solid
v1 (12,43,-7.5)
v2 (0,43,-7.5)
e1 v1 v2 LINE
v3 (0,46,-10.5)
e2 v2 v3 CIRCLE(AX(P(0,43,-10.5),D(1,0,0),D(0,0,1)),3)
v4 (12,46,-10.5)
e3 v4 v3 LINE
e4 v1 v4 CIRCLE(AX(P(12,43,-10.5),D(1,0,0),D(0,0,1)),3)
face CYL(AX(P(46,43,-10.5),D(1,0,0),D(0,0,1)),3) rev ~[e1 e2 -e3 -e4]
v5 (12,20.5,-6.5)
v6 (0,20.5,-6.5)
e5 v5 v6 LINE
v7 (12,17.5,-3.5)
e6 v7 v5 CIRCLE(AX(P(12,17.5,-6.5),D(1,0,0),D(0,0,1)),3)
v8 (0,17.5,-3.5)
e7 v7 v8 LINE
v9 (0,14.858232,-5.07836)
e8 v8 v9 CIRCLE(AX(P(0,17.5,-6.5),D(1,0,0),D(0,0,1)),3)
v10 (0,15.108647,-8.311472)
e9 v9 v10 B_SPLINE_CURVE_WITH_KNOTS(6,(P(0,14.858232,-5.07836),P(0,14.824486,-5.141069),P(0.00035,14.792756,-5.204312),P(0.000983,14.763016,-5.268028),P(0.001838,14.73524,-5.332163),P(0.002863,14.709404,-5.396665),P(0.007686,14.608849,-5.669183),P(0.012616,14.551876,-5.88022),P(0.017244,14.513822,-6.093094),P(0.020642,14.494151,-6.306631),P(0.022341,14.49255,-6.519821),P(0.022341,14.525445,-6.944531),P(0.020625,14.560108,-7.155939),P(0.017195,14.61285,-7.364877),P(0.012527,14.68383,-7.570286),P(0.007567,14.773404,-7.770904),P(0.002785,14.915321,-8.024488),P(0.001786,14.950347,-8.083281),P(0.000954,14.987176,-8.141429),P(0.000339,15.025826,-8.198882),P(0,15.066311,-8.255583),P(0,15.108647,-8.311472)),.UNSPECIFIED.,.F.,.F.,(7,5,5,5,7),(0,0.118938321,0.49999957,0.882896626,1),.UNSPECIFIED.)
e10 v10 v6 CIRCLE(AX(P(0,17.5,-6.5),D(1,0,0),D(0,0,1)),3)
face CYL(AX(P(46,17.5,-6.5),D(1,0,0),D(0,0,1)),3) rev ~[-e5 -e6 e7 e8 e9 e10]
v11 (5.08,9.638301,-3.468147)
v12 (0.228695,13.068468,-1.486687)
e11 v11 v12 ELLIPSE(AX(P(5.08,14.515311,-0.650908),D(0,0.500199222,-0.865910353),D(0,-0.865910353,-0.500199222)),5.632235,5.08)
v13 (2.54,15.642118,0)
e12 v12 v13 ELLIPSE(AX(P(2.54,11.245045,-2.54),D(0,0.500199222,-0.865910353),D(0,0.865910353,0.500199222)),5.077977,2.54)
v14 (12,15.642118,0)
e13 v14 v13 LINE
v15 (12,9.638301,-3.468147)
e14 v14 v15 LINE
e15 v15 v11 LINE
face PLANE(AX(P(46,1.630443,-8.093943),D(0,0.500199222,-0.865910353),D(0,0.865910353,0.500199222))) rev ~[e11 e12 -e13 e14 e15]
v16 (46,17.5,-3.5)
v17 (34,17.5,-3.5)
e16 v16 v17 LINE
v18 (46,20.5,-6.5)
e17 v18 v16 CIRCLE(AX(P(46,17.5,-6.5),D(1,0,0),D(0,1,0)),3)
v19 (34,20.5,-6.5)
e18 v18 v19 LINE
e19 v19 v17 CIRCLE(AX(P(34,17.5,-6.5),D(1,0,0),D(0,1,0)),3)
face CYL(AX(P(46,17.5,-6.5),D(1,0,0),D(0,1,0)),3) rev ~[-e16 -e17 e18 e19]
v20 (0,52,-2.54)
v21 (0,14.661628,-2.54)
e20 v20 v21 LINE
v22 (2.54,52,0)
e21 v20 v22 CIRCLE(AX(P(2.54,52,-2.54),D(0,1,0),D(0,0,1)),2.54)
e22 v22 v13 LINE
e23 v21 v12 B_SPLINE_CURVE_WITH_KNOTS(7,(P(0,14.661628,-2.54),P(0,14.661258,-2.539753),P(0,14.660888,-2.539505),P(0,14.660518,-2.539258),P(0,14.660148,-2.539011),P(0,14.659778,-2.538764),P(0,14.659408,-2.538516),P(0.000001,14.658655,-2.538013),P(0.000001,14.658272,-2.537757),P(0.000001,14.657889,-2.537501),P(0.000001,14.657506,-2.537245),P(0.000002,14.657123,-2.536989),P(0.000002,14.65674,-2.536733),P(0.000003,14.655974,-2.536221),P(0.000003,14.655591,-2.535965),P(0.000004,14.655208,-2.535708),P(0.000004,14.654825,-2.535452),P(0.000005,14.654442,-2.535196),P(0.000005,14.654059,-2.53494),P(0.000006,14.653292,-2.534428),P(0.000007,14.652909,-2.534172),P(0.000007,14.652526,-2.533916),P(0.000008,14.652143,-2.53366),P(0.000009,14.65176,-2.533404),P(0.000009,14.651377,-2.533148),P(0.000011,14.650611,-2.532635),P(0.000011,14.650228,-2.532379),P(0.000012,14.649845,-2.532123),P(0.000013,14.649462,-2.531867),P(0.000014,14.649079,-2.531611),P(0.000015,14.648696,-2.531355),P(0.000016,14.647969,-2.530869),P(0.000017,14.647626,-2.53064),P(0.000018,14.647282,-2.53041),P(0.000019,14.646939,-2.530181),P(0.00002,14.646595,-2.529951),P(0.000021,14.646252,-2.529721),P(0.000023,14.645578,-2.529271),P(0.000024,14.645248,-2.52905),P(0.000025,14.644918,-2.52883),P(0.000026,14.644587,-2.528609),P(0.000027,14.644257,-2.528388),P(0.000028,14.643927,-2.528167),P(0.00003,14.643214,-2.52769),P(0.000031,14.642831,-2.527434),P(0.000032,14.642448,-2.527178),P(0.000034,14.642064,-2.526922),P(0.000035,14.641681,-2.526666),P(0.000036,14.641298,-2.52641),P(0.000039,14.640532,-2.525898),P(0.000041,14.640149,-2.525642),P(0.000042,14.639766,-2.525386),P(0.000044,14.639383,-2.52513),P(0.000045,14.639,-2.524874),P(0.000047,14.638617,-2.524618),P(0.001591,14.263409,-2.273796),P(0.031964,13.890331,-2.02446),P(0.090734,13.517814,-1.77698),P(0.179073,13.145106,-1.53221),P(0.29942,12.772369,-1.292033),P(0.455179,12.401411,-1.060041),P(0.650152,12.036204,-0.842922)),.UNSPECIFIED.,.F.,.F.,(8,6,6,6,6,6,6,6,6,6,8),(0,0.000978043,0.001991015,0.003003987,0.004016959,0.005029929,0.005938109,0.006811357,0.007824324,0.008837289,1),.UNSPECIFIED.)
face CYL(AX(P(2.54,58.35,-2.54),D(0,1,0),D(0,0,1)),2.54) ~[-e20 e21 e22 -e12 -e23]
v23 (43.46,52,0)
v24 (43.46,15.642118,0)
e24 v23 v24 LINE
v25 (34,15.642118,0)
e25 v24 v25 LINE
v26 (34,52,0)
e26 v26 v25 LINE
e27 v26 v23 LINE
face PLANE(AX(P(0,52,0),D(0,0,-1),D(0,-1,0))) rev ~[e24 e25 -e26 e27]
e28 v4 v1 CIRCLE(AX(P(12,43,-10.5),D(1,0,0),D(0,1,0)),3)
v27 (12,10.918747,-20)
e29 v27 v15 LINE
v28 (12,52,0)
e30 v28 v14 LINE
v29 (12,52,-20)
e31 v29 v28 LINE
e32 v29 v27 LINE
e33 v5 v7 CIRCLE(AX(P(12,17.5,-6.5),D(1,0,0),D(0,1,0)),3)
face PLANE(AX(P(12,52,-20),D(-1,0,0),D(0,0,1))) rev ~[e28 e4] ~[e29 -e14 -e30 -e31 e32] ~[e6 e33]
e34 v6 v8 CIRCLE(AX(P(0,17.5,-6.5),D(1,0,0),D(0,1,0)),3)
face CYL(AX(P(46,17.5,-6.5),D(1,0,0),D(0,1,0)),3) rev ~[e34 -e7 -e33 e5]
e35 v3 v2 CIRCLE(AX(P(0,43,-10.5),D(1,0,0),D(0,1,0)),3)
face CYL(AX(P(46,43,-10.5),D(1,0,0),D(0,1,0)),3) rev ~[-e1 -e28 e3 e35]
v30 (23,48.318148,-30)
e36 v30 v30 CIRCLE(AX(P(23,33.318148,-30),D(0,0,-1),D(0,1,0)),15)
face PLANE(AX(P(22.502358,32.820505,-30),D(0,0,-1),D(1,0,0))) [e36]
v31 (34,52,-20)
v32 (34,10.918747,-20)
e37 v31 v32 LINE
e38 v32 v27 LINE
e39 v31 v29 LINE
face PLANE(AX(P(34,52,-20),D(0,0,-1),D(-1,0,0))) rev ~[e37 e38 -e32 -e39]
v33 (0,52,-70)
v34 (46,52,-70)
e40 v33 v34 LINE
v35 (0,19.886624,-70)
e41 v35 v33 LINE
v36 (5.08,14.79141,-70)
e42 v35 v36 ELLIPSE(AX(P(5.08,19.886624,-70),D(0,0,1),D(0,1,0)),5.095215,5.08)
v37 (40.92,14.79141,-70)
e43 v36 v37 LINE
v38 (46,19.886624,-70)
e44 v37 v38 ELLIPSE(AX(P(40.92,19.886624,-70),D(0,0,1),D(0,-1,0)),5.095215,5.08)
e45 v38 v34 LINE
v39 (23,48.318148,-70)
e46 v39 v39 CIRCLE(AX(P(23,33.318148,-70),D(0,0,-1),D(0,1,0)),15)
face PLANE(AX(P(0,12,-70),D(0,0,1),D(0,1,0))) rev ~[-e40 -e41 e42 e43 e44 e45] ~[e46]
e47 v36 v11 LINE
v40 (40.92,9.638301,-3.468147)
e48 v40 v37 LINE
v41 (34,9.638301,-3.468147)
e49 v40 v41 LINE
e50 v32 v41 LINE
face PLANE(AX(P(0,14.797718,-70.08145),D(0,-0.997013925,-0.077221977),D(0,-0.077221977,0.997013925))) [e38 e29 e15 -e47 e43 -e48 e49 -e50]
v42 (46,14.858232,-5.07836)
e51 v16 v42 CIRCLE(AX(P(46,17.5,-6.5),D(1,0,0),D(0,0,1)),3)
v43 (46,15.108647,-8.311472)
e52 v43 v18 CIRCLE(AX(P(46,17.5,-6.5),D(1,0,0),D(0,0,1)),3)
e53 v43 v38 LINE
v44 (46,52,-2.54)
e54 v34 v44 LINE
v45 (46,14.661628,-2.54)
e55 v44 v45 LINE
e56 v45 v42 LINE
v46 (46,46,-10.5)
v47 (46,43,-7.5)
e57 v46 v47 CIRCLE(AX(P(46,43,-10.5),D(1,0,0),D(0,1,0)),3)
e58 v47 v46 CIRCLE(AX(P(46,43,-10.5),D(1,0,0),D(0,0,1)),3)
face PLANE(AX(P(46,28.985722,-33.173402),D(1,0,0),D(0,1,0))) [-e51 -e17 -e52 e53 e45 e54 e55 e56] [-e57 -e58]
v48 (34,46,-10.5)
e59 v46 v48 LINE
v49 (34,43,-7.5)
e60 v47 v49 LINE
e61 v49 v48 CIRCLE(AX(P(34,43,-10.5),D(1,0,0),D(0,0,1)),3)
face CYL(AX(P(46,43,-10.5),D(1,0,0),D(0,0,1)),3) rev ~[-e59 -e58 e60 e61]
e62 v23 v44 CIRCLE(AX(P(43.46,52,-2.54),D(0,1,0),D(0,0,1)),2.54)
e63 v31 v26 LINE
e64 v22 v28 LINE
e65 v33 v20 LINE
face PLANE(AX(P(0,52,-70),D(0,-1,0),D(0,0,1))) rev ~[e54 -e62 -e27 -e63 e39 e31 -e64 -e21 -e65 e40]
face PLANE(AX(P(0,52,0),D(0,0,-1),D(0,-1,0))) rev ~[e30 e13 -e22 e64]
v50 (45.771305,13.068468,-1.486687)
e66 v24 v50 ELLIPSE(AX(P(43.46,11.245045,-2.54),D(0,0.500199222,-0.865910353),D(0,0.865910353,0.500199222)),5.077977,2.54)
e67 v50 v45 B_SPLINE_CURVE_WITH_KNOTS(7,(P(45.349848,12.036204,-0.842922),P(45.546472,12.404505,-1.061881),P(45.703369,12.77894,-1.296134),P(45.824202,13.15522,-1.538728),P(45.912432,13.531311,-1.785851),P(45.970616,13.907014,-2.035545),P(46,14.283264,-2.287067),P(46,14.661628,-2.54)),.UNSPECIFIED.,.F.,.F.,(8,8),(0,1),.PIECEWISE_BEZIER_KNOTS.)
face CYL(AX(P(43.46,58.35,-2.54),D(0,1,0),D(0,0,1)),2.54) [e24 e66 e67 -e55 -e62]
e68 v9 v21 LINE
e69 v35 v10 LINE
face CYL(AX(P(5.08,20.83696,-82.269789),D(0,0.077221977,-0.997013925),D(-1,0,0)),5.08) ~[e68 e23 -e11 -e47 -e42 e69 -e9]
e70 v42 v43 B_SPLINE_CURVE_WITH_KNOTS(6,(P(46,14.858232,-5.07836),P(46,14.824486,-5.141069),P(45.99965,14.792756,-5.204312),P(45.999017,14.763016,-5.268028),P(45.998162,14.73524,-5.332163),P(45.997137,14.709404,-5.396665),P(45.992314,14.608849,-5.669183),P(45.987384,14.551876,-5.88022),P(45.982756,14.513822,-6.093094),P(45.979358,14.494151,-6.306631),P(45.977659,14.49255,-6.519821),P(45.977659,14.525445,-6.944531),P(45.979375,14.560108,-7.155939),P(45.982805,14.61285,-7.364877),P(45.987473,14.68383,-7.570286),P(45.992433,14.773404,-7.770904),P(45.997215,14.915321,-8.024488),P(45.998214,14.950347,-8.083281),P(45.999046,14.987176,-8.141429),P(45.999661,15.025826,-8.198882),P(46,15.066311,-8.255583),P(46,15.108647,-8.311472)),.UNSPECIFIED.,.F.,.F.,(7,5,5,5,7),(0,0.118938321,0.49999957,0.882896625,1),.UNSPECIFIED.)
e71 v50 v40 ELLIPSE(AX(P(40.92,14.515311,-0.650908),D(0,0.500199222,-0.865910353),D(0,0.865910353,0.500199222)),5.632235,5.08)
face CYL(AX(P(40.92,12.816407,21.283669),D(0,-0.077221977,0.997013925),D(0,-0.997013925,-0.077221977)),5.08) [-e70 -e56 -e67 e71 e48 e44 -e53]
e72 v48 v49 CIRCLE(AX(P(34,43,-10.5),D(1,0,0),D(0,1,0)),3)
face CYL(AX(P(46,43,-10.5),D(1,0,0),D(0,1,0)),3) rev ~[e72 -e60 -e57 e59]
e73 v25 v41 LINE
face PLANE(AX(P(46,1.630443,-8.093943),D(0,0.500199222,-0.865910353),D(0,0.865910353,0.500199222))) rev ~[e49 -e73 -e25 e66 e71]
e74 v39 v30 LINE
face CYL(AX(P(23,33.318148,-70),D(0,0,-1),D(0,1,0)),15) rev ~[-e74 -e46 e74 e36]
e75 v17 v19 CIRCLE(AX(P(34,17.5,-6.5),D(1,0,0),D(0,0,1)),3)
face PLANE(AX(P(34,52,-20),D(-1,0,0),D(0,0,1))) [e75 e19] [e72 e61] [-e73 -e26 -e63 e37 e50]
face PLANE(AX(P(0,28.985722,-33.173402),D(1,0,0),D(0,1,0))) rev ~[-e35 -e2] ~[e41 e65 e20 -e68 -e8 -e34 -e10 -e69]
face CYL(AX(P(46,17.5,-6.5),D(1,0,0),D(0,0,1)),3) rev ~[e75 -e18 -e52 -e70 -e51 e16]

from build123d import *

# Parameters (mm, degrees)
F1_DEPTH     = 46
F3_DEPTH     = 40
F5_DEPTH     = 254
F6_W         = 22
F6_H         = 20
F7_DEPTH     = 1346.2
F8_DEPTH     = 65
F10_DEPTH    = 127
F12_DEPTH    = 254
F14_DEPTH    = 254
F15_T1_DEPTH = 103.8636030304
F15_T3_DEPTH = 103.8636030304
F17_T1_DEPTH = 49.0578822911


# Not quite as in the source:
# - a fillet or chamfer that OpenCascade refuses, or shapes differently, is made with other operations: its cross-section is extruded or revolved along the edge and cut away or added
# - a feature of the source that left no trace in its solid (it failed there, or was rolled back) is left out


with BuildPart() as f1:
    # F0 (on Right) → F1 (new body)
    with BuildSketch(Plane.YZ):
        Polygon((52, 0), (0, 0), (12, -60), (12, -70), (52, -70), align=None)
    extrude(amount=F1_DEPTH)

    # F2 (on face) → F3 (cut)
    with BuildSketch(Plane(origin=(0, 0, -70), x_dir=(1, 0, 0), z_dir=(0, 0, -1))):
        with BuildLine():
            Line((23, -33.3181476), (38, -33.3181476))
            ThreePointArc((38, -33.3181476), (12.3933982822, -22.7115458822), (23, -48.3181476))
            Line((23, -48.3181476), (23, -33.3181476))
        make_face()
        with BuildLine():
            ThreePointArc((23, -48.3181476), (33.6066017178, -43.9247493178), (38, -33.3181476))
            Line((38, -33.3181476), (23, -33.3181476))
            Line((23, -33.3181476), (23, -48.3181476))
        make_face()
    extrude(amount=-F3_DEPTH, mode=Mode.SUBTRACT)

    # F4 (on face) → F5 (cut)
    with BuildSketch(Plane.YZ.offset(46)):
        with BuildLine():
            Line((17.5, -6.5), (20.5, -6.5))
            ThreePointArc((20.5, -6.5), (19.6213203436, -4.3786796564), (17.5, -3.5))
            Line((17.5, -3.5), (17.5, -6.5))
        make_face()
        with BuildLine():
            ThreePointArc((17.5, -3.5), (15.3786796564, -8.6213203436), (20.5, -6.5))
            Line((20.5, -6.5), (17.5, -6.5))
            Line((17.5, -6.5), (17.5, -3.5))
        make_face()
    extrude(amount=-F5_DEPTH, mode=Mode.SUBTRACT)

    # F6 (on face) → F7 (cut)
    with BuildSketch(Plane(origin=(0, 52, 0), x_dir=(-1, 0, 0), z_dir=(0, 1, 0))):
        with Locations((-23, -10)):
            Rectangle(F6_W, F6_H)
    extrude(amount=-F7_DEPTH, mode=Mode.SUBTRACT)

    # F4 (on face) → F8 (cut)
    with BuildSketch(Plane.YZ.offset(46)):
        with BuildLine():
            ThreePointArc((43, -7.5), (40.8786796564, -12.6213203436), (46, -10.5))
            ThreePointArc((46, -10.5), (45.1213203436, -8.3786796564), (43, -7.5))
        make_face()
    extrude(amount=-F8_DEPTH, mode=Mode.SUBTRACT)

    # F9 (on face) → F10 (cut)
    with BuildSketch(Plane.YZ.offset(46)):
        Polygon((1.1435132474, -8.0939428881), (1.6304426827, -8.0939428881), (15.6421177089, 0), (0, 0), align=None)
    extrude(amount=-F10_DEPTH, mode=Mode.SUBTRACT)

    # F11 (on Right) → F12 (cut)
    with BuildSketch(Plane.YZ):
        Polygon((0, -70.3560113907), (14.7977182642, -70.0814500451), (9.3696815893, 0), (0, 0), align=None)
    extrude(amount=F12_DEPTH, mode=Mode.SUBTRACT)

    # F13 (on face) → F14 (cut)
    with BuildSketch(Plane.XY):
        with BuildLine():
            add(Edge.make_bspline(
                [(0, 12.6551715657), (0, 9.9420361221), (2.5992305018, 9.7406599671), (3.9225574583, 9.6255876124)],
                knots=[0, 0, 0, 0, 4.9562925603, 4.9562925603, 4.9562925603, 4.9562925603], degree=3))
            Line((0, 12.6551715657), (0, 9.539283812))
            Line((0, 9.539283812), (3.9225574583, 9.6255876124))
        make_face()
        with BuildLine():
            Line((46, 9.539283812), (46, 12.6551715657))
            add(Edge.make_bspline(
                [(46, 12.6551715657), (46, 9.9420361221), (43.4007694982, 9.7406599671), (42.0774425417, 9.6255876124)],
                knots=[0, 0, 0, 0, 4.9562925603, 4.9562925603, 4.9562925603, 4.9562925603], degree=3))
            Line((42.0774425417, 9.6255876124), (46, 9.539283812))
        make_face()
    extrude(amount=-F14_DEPTH, mode=Mode.SUBTRACT)

    # F15: fillet of radius 5.08 on 2 edges, made by hand

    # F15_s2 → F15_t1 (cut)
    with BuildSketch(Plane(origin=(0, 6.4583208178, -83.3834616235), x_dir=(1, 0, 0), z_dir=(0, -0.0772219774, 0.9970139248))):
        with BuildLine():
            ThreePointArc((0, 14.4217030153), (1.4878975516, 10.8296005669), (5.08, 9.3417030153))
            Line((5.08, 9.3417030153), (0, 9.3417030153))
            Line((0, 9.3417030153), (0, 14.4217030153))
        make_face()
    extrude(amount=F15_T1_DEPTH, mode=Mode.SUBTRACT)

    # F15_s4 → F15_t3 (cut)
    with BuildSketch(Plane(origin=(0, -1.5622319844, 20.169996876), x_dir=(1, 0, 0), z_dir=(0, 0.0772219774, -0.9970139248))):
        with BuildLine():
            ThreePointArc((40.92, -9.3417030153), (44.5121024484, -10.8296005669), (46, -14.4217030153))
            Line((46, -14.4217030153), (46, -9.3417030153))
            Line((46, -9.3417030153), (40.92, -9.3417030153))
        make_face()
    extrude(amount=F15_T3_DEPTH, mode=Mode.SUBTRACT)

    # F17: fillet of radius 2.54 on 2 edges, made by hand

    # F17_s2 → F17_t1 (cut)
    with BuildSketch(Plane.XZ.offset(-58.35)):
        with BuildLine():
            ThreePointArc((2.54, 0), (0.7439487758, -0.7439487758), (0, -2.54))
            Line((0, -2.54), (0, 0))
            Line((0, 0), (2.54, 0))
        make_face()
        with BuildLine():
            ThreePointArc((43.46, 0), (45.2560512242, -0.7439487758), (46, -2.54))
            Line((46, -2.54), (46, 0))
            Line((46, 0), (43.46, 0))
        make_face()
    extrude(amount=F17_T1_DEPTH, mode=Mode.SUBTRACT)


solid = f1.part
